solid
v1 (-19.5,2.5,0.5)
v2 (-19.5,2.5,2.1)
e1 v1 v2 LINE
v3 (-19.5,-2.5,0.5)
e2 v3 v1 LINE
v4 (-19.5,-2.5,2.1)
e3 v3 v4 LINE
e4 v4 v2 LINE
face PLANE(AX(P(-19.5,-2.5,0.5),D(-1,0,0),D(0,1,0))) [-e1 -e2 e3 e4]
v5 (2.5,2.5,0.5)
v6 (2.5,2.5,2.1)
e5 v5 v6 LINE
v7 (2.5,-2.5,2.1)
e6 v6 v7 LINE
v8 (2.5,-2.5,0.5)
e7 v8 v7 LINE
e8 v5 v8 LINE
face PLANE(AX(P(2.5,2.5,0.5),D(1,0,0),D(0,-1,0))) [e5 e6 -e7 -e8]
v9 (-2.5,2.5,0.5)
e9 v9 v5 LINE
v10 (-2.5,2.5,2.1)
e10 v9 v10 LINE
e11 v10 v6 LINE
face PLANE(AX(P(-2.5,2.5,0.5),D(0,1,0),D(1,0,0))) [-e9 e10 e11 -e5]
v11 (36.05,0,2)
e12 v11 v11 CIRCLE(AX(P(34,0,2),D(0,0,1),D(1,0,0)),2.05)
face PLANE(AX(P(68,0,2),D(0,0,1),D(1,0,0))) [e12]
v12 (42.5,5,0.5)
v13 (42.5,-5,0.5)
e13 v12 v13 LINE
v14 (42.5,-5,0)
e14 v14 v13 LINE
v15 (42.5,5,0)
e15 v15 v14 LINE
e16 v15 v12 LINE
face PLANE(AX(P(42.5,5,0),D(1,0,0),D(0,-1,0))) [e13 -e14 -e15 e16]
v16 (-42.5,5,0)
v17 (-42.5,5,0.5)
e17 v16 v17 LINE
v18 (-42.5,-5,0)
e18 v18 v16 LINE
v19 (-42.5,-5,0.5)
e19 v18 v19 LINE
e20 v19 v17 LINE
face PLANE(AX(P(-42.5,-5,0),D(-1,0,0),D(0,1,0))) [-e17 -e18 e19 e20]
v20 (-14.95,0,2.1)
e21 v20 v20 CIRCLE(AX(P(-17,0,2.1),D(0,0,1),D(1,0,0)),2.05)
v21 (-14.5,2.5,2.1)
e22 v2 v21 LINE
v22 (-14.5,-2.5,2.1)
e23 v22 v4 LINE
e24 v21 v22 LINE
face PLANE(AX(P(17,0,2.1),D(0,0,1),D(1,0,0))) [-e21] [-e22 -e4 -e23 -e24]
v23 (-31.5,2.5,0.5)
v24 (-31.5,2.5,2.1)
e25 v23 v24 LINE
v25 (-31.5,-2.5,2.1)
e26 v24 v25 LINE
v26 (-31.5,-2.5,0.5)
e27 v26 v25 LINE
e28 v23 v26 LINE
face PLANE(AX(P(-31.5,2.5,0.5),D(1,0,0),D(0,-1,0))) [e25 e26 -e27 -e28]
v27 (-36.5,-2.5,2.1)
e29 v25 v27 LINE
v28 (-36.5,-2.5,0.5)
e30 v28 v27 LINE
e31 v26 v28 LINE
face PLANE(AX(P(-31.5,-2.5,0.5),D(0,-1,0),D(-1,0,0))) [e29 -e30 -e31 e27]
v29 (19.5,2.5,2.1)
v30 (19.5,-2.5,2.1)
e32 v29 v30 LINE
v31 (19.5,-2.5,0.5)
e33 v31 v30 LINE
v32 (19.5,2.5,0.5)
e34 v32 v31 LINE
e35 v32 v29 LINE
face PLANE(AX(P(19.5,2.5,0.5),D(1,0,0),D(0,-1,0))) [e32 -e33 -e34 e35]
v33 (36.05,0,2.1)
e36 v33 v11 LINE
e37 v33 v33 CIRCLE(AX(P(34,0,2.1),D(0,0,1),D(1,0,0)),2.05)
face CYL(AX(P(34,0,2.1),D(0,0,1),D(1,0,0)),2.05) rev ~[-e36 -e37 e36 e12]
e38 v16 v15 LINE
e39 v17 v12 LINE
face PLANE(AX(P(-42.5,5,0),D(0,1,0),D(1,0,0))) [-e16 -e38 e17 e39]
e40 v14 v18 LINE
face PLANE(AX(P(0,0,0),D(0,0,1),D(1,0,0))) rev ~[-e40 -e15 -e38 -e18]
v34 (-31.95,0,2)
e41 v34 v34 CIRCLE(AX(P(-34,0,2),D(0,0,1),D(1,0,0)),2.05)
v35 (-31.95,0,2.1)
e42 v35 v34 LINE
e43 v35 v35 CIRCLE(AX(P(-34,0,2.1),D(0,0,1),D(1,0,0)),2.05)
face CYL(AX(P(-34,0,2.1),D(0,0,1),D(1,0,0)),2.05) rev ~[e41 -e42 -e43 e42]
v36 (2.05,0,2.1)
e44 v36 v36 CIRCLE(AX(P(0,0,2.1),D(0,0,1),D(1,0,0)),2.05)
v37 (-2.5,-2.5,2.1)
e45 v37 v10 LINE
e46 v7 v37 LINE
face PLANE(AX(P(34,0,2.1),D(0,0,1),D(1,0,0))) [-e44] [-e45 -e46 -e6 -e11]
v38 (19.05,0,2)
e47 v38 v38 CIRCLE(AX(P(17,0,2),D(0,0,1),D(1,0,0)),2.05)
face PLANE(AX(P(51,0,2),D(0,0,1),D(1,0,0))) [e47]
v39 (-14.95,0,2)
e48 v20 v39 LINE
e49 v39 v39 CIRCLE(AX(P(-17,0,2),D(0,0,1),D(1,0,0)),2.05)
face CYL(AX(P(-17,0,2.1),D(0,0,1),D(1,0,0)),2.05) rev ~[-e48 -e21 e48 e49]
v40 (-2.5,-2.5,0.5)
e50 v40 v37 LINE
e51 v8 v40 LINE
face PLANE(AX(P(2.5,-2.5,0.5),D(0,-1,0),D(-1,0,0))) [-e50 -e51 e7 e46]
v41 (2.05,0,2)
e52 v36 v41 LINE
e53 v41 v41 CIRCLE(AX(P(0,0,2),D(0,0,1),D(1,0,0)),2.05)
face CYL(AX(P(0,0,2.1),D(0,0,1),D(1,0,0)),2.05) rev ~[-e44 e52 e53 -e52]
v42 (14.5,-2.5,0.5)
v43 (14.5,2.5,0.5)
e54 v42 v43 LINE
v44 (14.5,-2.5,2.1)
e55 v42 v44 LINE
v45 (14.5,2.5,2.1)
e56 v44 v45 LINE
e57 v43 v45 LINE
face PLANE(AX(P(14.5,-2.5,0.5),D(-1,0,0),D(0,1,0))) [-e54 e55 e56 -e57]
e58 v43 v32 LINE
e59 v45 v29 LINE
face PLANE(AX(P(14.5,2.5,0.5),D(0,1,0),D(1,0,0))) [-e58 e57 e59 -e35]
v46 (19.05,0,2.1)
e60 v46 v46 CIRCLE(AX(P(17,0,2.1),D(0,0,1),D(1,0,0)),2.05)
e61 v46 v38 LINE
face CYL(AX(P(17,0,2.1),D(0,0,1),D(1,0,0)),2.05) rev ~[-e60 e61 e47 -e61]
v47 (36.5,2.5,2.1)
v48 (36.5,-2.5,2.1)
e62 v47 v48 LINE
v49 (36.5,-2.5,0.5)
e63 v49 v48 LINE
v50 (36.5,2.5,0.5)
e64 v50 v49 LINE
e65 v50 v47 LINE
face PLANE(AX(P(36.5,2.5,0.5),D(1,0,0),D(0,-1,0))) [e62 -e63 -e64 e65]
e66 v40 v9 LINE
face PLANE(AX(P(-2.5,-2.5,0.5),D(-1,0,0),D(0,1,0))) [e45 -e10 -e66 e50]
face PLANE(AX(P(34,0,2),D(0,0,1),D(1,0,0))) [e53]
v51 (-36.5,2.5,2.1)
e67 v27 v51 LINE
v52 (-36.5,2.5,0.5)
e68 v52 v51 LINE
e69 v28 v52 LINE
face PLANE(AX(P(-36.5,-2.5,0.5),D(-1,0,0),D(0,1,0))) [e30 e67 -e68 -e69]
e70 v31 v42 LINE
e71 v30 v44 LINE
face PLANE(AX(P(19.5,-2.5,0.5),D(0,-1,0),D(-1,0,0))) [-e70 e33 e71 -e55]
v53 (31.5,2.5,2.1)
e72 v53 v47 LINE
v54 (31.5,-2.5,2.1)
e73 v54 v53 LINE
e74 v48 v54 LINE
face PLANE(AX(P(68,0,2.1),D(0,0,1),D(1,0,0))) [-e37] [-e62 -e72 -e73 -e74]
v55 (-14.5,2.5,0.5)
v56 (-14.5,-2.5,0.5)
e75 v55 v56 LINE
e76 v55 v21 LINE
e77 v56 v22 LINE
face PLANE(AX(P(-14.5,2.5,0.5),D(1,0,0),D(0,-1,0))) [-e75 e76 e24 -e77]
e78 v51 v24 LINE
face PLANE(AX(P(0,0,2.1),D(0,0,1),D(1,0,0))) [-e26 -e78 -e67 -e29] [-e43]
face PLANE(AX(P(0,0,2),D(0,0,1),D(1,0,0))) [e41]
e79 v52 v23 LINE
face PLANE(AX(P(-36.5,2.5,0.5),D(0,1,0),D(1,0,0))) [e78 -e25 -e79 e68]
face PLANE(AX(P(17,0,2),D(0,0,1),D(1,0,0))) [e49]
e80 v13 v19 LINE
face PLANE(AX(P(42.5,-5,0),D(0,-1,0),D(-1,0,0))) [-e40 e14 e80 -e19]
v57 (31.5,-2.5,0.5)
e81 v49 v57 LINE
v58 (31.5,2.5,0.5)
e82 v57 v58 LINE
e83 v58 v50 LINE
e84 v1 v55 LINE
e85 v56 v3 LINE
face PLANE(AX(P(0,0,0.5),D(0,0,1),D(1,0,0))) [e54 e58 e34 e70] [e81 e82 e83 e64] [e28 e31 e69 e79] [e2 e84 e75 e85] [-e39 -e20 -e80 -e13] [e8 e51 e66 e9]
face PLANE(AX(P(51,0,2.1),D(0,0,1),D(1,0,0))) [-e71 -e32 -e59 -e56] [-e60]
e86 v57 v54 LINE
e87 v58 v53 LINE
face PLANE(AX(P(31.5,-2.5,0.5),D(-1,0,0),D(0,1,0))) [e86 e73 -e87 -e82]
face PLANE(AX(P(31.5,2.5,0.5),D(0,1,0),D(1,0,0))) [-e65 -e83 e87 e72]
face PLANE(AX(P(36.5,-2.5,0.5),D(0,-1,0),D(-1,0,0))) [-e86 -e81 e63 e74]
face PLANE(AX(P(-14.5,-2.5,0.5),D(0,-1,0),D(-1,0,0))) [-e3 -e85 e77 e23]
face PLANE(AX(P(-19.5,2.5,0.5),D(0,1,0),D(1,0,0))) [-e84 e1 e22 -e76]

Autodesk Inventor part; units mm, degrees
ref_plane "YZ Plane" through (0, 0, 0) normal (1, 0, 0) x (0, 1, 0)
ref_plane "XZ Plane" through (0, 0, 0) normal (0, 1, 0) x (-1, 0, 0)
ref_plane "XY Plane" through (0, 0, 0) normal (0, 0, 1) x (1, 0, 0)
sketch "Sketch1" plane through (0, 0, 0) normal (0, 0, 1) x (1, 0, 0)
  line L0 (-42.5, 5) -> (42.5, 5)
  line L1 (42.5, 5) -> (42.5, -5)
  line L2 (42.5, -5) -> (-42.5, -5)
  line L3 (-42.5, -5) -> (-42.5, 5)
  line L4 (-42.5, 5) -> (42.5, -5) construction
  line L5 (42.5, 5) -> (-42.5, -5) construction
  point P0 (0, 0)
  dimension "d0" = 85
  dimension "d1" = 10
extrude "Extrusion1" add sketch "Sketch1" along normal blind 0.5
sketch "Sketch2" plane through (0, 0, 0.5) normal (0, 0, 1) x (1, 0, 0)
  line L0 (-36.5, 2.5) -> (-31.5, 2.5)
  line L1 (-31.5, 2.5) -> (-31.5, -2.5)
  line L2 (-31.5, -2.5) -> (-36.5, -2.5)
  line L3 (-36.5, -2.5) -> (-36.5, 2.5)
  line L4 (-36.5, 2.5) -> (-31.5, -2.5) construction
  line L5 (-31.5, 2.5) -> (-36.5, -2.5) construction
  line L6 (-42.5, 5) -> (-42.5, -5) projected
  point P0 (0, 0)
  point P1 (-34, 0)
  point P2 (-34, 0)
  point P3 (-42.5, 0)
  dimension "d4" = 5
  dimension "d5" = 5
  dimension "d6" = 6
extrude "Extrusion2" add sketch "Sketch2" along normal blind 1.6
sketch "Sketch3" plane through (0, 0, 2.1) normal (0, 0, 1) x (1, 0, 0)
  line L0 (-31.5, 2.5) -> (-36.5, 2.5) projected
  line L1 (-36.5, 2.5) -> (-36.5, -2.5) projected
  line L2 (-36.5, -2.5) -> (-31.5, -2.5) projected
  line L3 (-31.5, -2.5) -> (-31.5, 2.5) projected
  circle A0 centre (-34, 0) radius 2.05
  point P0 (0, 0)
  point P1 (-31.5, 0)
  point P2 (-34, 2.5)
  dimension "d9" = 4.1
extrude "Extrusion3" cut sketch "Sketch3" against normal blind 0.1 contours A0
pattern_linear "Rectangular Pattern1" count 5 spacing 17 along (1, 0, 0) of "Extrusion3", "Extrusion2"
properties part number "LED Strip 5050 x 5"
